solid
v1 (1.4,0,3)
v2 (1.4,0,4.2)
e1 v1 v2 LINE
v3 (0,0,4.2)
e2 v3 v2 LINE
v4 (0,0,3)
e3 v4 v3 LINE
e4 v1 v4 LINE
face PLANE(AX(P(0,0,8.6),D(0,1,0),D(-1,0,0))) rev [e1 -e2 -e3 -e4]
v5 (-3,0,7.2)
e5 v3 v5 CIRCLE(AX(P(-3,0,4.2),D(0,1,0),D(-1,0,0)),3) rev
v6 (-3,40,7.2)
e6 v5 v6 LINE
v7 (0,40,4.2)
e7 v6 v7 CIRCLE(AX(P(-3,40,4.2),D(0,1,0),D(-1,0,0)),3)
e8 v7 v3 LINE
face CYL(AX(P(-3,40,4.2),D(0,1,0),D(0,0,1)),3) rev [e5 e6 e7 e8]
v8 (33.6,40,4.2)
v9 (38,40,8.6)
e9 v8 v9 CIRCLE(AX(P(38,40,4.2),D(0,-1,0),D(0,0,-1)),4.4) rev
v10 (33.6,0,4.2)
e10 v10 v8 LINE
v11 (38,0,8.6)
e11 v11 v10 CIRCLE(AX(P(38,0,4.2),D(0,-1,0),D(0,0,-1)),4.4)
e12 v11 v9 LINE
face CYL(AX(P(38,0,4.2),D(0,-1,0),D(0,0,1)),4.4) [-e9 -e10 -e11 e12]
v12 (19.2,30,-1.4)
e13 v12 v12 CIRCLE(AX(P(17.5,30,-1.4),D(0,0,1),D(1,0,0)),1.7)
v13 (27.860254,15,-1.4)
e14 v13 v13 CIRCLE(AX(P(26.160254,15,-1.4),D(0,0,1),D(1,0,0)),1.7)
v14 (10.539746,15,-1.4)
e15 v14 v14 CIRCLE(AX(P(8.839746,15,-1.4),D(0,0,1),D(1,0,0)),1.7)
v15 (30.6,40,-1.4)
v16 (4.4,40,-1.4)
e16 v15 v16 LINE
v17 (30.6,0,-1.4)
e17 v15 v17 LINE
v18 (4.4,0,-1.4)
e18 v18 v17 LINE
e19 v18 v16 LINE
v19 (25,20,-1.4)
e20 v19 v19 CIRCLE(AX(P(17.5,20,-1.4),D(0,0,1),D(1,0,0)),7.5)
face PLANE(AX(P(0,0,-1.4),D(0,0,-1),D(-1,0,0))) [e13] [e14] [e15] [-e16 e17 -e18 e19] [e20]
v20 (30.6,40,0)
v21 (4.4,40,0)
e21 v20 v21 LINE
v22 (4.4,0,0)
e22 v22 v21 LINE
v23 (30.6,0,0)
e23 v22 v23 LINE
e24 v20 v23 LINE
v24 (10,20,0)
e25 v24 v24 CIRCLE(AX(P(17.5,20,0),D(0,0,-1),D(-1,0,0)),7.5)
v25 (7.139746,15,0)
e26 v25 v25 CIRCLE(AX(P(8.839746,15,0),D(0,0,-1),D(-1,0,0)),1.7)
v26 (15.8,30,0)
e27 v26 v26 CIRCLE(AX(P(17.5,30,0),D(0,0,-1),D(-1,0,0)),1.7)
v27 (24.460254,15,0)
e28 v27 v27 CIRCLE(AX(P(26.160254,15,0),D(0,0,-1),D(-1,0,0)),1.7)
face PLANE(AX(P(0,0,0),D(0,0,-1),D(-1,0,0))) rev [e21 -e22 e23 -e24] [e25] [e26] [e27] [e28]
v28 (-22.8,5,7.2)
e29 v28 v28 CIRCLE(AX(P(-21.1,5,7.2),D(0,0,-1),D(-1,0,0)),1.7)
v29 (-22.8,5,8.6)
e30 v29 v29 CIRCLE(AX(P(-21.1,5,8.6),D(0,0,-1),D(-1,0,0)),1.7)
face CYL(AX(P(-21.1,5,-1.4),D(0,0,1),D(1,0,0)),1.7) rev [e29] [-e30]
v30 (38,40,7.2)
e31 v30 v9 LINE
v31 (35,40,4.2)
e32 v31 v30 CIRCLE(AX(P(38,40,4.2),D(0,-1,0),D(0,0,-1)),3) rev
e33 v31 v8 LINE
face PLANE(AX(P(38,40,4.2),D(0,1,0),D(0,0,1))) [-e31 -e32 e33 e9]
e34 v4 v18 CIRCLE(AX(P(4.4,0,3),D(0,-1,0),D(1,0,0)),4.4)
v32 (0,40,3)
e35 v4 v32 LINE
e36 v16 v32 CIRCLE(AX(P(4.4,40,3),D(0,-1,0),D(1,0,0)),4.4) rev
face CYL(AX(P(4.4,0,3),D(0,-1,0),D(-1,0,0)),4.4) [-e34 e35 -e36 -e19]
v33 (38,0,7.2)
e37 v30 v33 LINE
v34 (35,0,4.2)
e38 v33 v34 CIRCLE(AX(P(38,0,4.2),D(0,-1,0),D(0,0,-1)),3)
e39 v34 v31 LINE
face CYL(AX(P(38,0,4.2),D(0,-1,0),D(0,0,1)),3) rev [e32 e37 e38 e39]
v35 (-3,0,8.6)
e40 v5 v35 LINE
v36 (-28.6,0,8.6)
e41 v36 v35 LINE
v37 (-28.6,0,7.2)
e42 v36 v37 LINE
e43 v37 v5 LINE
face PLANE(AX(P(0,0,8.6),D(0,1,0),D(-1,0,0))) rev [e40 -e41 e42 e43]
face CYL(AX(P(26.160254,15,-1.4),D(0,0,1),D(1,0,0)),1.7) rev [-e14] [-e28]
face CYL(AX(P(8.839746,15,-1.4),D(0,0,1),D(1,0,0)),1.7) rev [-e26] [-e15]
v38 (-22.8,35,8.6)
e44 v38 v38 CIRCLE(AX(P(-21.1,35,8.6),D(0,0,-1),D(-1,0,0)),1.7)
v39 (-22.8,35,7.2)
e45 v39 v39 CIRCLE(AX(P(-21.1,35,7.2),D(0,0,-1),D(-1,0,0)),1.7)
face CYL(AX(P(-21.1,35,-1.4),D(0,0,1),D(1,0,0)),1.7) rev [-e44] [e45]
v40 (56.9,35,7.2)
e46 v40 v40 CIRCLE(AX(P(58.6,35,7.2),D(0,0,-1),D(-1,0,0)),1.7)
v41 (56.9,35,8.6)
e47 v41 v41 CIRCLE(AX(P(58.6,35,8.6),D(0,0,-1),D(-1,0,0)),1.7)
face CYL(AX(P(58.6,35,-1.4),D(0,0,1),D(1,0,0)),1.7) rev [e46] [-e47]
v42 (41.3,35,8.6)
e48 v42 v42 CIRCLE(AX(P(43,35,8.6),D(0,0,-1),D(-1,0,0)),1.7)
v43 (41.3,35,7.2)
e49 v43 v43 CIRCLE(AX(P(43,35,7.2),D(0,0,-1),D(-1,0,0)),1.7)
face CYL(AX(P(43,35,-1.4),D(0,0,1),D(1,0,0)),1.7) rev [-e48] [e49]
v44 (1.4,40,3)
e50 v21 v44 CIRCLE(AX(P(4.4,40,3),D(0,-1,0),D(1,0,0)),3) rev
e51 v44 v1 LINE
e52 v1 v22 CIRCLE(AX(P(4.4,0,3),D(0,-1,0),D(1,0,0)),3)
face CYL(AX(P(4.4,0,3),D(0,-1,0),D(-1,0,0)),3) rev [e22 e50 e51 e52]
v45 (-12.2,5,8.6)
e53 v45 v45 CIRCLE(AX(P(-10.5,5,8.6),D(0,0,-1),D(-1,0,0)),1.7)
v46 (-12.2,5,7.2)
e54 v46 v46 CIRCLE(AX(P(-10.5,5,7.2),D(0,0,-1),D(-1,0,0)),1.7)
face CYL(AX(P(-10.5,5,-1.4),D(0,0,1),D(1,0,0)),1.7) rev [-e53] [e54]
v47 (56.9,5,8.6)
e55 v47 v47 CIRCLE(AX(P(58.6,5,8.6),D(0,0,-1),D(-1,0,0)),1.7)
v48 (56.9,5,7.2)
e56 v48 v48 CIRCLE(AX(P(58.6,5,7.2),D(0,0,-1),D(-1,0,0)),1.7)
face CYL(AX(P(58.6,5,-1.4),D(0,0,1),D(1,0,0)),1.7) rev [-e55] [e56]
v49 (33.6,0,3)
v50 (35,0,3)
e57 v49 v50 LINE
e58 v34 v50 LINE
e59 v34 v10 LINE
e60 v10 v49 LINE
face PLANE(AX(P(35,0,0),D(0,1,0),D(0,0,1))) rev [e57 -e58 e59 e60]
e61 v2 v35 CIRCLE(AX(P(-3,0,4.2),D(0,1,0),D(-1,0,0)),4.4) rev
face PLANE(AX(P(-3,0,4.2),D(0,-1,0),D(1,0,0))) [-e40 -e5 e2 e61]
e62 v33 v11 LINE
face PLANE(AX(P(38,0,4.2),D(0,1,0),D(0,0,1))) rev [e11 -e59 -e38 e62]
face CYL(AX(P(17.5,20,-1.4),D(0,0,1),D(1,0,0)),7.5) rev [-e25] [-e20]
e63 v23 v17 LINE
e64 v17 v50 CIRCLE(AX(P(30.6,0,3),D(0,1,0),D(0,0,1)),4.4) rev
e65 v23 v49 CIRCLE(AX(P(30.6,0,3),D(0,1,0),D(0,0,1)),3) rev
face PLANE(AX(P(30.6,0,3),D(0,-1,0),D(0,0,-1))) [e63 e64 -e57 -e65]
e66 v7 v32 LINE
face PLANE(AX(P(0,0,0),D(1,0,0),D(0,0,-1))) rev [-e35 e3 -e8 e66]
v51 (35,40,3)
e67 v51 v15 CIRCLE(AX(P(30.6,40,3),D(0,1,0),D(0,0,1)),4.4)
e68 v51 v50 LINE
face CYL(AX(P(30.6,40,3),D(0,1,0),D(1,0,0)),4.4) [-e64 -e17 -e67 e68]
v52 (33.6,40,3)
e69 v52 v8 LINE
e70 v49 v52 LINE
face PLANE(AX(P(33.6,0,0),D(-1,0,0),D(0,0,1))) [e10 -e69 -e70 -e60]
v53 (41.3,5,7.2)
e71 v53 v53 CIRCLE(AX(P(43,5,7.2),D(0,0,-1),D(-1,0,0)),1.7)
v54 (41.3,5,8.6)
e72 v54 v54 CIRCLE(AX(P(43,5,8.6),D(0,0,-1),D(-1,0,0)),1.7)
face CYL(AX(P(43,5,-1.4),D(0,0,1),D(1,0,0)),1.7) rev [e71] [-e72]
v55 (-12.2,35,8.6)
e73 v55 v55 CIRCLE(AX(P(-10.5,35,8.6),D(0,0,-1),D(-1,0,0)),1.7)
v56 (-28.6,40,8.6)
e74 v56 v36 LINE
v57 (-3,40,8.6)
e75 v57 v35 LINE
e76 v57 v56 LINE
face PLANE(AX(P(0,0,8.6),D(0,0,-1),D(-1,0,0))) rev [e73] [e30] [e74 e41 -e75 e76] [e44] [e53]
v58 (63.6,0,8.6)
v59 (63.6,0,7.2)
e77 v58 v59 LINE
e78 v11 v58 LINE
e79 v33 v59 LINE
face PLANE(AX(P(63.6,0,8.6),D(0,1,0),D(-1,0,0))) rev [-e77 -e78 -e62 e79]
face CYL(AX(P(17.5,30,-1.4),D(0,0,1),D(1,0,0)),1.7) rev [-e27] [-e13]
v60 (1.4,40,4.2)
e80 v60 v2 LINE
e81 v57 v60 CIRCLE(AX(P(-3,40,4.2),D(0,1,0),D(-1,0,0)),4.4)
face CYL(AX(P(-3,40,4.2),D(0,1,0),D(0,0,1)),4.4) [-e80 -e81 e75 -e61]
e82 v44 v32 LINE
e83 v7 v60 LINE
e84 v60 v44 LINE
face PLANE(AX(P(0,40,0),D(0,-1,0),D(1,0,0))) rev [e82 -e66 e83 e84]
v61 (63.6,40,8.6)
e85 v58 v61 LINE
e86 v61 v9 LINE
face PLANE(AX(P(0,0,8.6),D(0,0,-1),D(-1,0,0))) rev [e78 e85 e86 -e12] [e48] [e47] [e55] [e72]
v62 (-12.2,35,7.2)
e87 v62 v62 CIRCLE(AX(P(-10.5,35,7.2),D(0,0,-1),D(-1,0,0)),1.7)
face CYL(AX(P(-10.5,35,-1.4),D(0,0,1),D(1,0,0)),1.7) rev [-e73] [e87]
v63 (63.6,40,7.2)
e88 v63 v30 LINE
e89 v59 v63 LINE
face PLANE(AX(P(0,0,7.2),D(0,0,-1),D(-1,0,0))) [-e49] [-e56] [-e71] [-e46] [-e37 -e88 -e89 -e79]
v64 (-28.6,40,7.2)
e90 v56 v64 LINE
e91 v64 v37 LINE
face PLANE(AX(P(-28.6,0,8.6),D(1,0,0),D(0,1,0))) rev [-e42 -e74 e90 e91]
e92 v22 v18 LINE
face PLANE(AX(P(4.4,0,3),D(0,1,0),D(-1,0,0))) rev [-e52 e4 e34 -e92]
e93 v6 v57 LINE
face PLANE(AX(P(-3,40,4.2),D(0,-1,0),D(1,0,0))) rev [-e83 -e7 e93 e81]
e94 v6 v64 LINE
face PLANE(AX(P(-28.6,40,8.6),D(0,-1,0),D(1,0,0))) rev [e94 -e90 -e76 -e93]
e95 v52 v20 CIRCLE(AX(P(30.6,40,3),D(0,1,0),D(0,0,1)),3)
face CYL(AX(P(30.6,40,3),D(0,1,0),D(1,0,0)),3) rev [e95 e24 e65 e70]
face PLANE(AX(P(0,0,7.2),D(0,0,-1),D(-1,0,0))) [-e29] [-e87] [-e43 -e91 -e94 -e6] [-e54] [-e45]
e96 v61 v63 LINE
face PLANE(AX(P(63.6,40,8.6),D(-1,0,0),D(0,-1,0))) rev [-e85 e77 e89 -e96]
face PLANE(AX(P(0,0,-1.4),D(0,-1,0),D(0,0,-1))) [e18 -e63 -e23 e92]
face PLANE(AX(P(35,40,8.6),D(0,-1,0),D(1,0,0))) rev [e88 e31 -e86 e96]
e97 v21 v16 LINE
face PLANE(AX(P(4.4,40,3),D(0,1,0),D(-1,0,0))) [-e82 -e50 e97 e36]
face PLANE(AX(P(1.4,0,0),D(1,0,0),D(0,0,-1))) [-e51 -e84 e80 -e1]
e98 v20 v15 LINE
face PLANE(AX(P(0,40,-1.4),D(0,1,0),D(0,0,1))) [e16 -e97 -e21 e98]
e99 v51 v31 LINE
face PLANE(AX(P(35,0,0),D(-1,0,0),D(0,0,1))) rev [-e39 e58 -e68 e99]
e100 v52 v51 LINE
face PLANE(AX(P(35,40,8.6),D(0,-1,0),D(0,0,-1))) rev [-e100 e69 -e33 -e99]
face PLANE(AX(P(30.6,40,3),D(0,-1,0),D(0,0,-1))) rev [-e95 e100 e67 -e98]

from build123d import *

# Parameters (mm, degrees)
SKETCH6_W                    = 35
SKETCH6_H                    = 40
BASE_FLANGE2_DEPTH           = 1.4
EDGE_FLANGE1_STRIP_W         = 11.6
EDGE_FLANGE1_STRIP_H         = 1.4
EDGE_FLANGE1_STRIP_CUT_DEPTH = 40
EDGE_FLANGE1_DEPTH           = 40
EDGE_FLANGE2_STRIP_W         = 11.6
EDGE_FLANGE2_STRIP_H         = 1.4
EDGE_FLANGE2_STRIP_CUT_DEPTH = 40
EDGE_FLANGE2_DEPTH           = 40
EDGE_FLANGE3_STRIP_W         = 11.6
EDGE_FLANGE3_STRIP_H         = 1.4
EDGE_FLANGE3_STRIP_CUT_DEPTH = 40
EDGE_FLANGE3_DEPTH           = 40
EDGE_FLANGE4_STRIP_W         = 11.6
EDGE_FLANGE4_STRIP_H         = 1.4
EDGE_FLANGE4_STRIP_CUT_DEPTH = 40
EDGE_FLANGE4_DEPTH           = 40
CUT_EXTRUDE2_DEPTH           = 76.623541308
CUT_EXTRUDE2_DEPTH_BACK      = 76.623541308
SKETCH11_R                   = 7.5
SKETCH11_R_2                 = 1.7
CUT_EXTRUDE3_DEPTH           = 76.795514379
CUT_EXTRUDE3_DEPTH_BACK      = 76.795514379
SKETCH26_R                   = 1.7
CUT_EXTRUDE4_DEPTH           = 76.795514379
CUT_EXTRUDE4_DEPTH_BACK      = 76.795514379
SKETCH27_R                   = 1.7


# Sheet-metal steps are written as plain solids
with BuildPart() as part:
    # Sketch6 → Base-Flange2 (new body)
    with BuildSketch(Plane.XY):
        with Locations((17.5, 20)):
            Rectangle(SKETCH6_W, SKETCH6_H)
    extrude(amount=-BASE_FLANGE2_DEPTH)

    # Edge-Flange1 strip (across the edge) → Edge-Flange1 strip cut (cut)
    with BuildSketch(Plane.XZ.offset(-40)):
        with Locations((-1.4, -0.7)):
            Rectangle(EDGE_FLANGE1_STRIP_W, EDGE_FLANGE1_STRIP_H)
    extrude(amount=EDGE_FLANGE1_STRIP_CUT_DEPTH, mode=Mode.SUBTRACT)

    # Edge-Flange1 section (across the edge) → Edge-Flange1 (add)
    with BuildSketch(Plane.XZ.offset(-40)):
        with BuildLine():
            Line((0, 3), (0, 8.6))
            Line((0, 8.6), (1.4, 8.6))
            Line((1.4, 8.6), (1.4, 3))
            ThreePointArc((1.4, 3), (2.278679656, 0.878679656), (4.4, 0))
            Line((4.4, 0), (4.4, -1.4))
            ThreePointArc((4.4, -1.4), (1.288730163, -0.111269837), (0, 3))
        make_face()
    extrude(amount=EDGE_FLANGE1_DEPTH)

    # Edge-Flange2 strip (across the edge) → Edge-Flange2 strip cut (cut)
    with BuildSketch(Plane(origin=(35, 0, 0), x_dir=(-1, 0, 0), z_dir=(0, 1, 0))):
        with Locations((-1.4, -0.7)):
            Rectangle(EDGE_FLANGE2_STRIP_W, EDGE_FLANGE2_STRIP_H)
    extrude(amount=EDGE_FLANGE2_STRIP_CUT_DEPTH, mode=Mode.SUBTRACT)

    # Edge-Flange2 section (across the edge) → Edge-Flange2 (add)
    with BuildSketch(Plane(origin=(35, 0, 0), x_dir=(-1, 0, 0), z_dir=(0, 1, 0))):
        with BuildLine():
            Line((0, 3), (0, 8.6))
            Line((0, 8.6), (1.4, 8.6))
            Line((1.4, 8.6), (1.4, 3))
            ThreePointArc((1.4, 3), (2.278679656, 0.878679656), (4.4, 0))
            Line((4.4, 0), (4.4, -1.4))
            ThreePointArc((4.4, -1.4), (1.288730163, -0.111269837), (0, 3))
        make_face()
    extrude(amount=EDGE_FLANGE2_DEPTH)

    # Edge-Flange3 strip (across the edge) → Edge-Flange3 strip cut (cut)
    with BuildSketch(Plane(origin=(0, 0, 8.6), x_dir=(0, 0, -1), z_dir=(0, 1, 0))):
        with Locations((-1.4, -0.7)):
            Rectangle(EDGE_FLANGE3_STRIP_W, EDGE_FLANGE3_STRIP_H)
    extrude(amount=EDGE_FLANGE3_STRIP_CUT_DEPTH, mode=Mode.SUBTRACT)

    # Edge-Flange3 section (across the edge) → Edge-Flange3 (add)
    with BuildSketch(Plane(origin=(0, 0, 8.6), x_dir=(0, 0, -1), z_dir=(0, 1, 0))):
        with BuildLine():
            Line((0, 3), (0, 28.6))
            Line((0, 28.6), (1.4, 28.6))
            Line((1.4, 28.6), (1.4, 3))
            ThreePointArc((1.4, 3), (2.278679656, 0.878679656), (4.4, 0))
            Line((4.4, 0), (4.4, -1.4))
            ThreePointArc((4.4, -1.4), (1.288730163, -0.111269837), (0, 3))
        make_face()
    extrude(amount=EDGE_FLANGE3_DEPTH)

    # Edge-Flange4 strip (across the edge) → Edge-Flange4 strip cut (cut)
    with BuildSketch(Plane(origin=(35, 40, 8.6), x_dir=(0, 0, -1), z_dir=(0, -1, 0))):
        with Locations((-1.4, -0.7)):
            Rectangle(EDGE_FLANGE4_STRIP_W, EDGE_FLANGE4_STRIP_H)
    extrude(amount=EDGE_FLANGE4_STRIP_CUT_DEPTH, mode=Mode.SUBTRACT)

    # Edge-Flange4 section (across the edge) → Edge-Flange4 (add)
    with BuildSketch(Plane(origin=(35, 40, 8.6), x_dir=(0, 0, -1), z_dir=(0, -1, 0))):
        with BuildLine():
            Line((0, 3), (0, 28.6))
            Line((0, 28.6), (1.4, 28.6))
            Line((1.4, 28.6), (1.4, 3))
            ThreePointArc((1.4, 3), (2.278679656, 0.878679656), (4.4, 0))
            Line((4.4, 0), (4.4, -1.4))
            ThreePointArc((4.4, -1.4), (1.288730163, -0.111269837), (0, 3))
        make_face()
    extrude(amount=EDGE_FLANGE4_DEPTH)

    # Sketch11 → Cut-Extrude2 (cut, two sides: drawn at the far end of the back side and taken through both)
    with BuildSketch(Plane.XY.offset(-CUT_EXTRUDE2_DEPTH_BACK)):
        with Locations((17.5, 20)):
            Circle(SKETCH11_R)
        with Locations((17.5, 30)):
            Circle(SKETCH11_R_2)
        with Locations((8.839745962, 15)):
            Circle(SKETCH11_R_2)
        with Locations((26.160254038, 15)):
            Circle(SKETCH11_R_2)
    extrude(amount=CUT_EXTRUDE2_DEPTH + CUT_EXTRUDE2_DEPTH_BACK, mode=Mode.SUBTRACT)

    # Sketch26 → Cut-Extrude3 (cut, two sides: drawn at the far end of the back side and taken through both)
    with BuildSketch(Plane.XY.offset(8.6).offset(-CUT_EXTRUDE3_DEPTH_BACK)):
        with Locations(Location((-21.1, 35, 0), (0, 0, 180))):
            Circle(SKETCH26_R)
        with Locations(Location((-10.5, 35, 0), (0, 0, 180))):
            Circle(SKETCH26_R)
        with Locations(Location((-21.1, 5, 0), (0, 0, 180))):
            Circle(SKETCH26_R)
        with Locations(Location((-10.5, 5, 0), (0, 0, 180))):
            Circle(SKETCH26_R)
    extrude(amount=CUT_EXTRUDE3_DEPTH + CUT_EXTRUDE3_DEPTH_BACK, mode=Mode.SUBTRACT)

    # Sketch27 → Cut-Extrude4 (cut, two sides: drawn at the far end of the back side and taken through both)
    with BuildSketch(Plane.XY.offset(8.6).offset(-CUT_EXTRUDE4_DEPTH_BACK)):
        with Locations(Location((43, 35, 0), (0, 0, 180))):
            Circle(SKETCH27_R)
        with Locations(Location((58.6, 35, 0), (0, 0, 180))):
            Circle(SKETCH27_R)
        with Locations(Location((43, 5, 0), (0, 0, 180))):
            Circle(SKETCH27_R)
        with Locations(Location((58.6, 5, 0), (0, 0, 180))):
            Circle(SKETCH27_R)
    extrude(amount=CUT_EXTRUDE4_DEPTH + CUT_EXTRUDE4_DEPTH_BACK, mode=Mode.SUBTRACT)


solid = part.part
